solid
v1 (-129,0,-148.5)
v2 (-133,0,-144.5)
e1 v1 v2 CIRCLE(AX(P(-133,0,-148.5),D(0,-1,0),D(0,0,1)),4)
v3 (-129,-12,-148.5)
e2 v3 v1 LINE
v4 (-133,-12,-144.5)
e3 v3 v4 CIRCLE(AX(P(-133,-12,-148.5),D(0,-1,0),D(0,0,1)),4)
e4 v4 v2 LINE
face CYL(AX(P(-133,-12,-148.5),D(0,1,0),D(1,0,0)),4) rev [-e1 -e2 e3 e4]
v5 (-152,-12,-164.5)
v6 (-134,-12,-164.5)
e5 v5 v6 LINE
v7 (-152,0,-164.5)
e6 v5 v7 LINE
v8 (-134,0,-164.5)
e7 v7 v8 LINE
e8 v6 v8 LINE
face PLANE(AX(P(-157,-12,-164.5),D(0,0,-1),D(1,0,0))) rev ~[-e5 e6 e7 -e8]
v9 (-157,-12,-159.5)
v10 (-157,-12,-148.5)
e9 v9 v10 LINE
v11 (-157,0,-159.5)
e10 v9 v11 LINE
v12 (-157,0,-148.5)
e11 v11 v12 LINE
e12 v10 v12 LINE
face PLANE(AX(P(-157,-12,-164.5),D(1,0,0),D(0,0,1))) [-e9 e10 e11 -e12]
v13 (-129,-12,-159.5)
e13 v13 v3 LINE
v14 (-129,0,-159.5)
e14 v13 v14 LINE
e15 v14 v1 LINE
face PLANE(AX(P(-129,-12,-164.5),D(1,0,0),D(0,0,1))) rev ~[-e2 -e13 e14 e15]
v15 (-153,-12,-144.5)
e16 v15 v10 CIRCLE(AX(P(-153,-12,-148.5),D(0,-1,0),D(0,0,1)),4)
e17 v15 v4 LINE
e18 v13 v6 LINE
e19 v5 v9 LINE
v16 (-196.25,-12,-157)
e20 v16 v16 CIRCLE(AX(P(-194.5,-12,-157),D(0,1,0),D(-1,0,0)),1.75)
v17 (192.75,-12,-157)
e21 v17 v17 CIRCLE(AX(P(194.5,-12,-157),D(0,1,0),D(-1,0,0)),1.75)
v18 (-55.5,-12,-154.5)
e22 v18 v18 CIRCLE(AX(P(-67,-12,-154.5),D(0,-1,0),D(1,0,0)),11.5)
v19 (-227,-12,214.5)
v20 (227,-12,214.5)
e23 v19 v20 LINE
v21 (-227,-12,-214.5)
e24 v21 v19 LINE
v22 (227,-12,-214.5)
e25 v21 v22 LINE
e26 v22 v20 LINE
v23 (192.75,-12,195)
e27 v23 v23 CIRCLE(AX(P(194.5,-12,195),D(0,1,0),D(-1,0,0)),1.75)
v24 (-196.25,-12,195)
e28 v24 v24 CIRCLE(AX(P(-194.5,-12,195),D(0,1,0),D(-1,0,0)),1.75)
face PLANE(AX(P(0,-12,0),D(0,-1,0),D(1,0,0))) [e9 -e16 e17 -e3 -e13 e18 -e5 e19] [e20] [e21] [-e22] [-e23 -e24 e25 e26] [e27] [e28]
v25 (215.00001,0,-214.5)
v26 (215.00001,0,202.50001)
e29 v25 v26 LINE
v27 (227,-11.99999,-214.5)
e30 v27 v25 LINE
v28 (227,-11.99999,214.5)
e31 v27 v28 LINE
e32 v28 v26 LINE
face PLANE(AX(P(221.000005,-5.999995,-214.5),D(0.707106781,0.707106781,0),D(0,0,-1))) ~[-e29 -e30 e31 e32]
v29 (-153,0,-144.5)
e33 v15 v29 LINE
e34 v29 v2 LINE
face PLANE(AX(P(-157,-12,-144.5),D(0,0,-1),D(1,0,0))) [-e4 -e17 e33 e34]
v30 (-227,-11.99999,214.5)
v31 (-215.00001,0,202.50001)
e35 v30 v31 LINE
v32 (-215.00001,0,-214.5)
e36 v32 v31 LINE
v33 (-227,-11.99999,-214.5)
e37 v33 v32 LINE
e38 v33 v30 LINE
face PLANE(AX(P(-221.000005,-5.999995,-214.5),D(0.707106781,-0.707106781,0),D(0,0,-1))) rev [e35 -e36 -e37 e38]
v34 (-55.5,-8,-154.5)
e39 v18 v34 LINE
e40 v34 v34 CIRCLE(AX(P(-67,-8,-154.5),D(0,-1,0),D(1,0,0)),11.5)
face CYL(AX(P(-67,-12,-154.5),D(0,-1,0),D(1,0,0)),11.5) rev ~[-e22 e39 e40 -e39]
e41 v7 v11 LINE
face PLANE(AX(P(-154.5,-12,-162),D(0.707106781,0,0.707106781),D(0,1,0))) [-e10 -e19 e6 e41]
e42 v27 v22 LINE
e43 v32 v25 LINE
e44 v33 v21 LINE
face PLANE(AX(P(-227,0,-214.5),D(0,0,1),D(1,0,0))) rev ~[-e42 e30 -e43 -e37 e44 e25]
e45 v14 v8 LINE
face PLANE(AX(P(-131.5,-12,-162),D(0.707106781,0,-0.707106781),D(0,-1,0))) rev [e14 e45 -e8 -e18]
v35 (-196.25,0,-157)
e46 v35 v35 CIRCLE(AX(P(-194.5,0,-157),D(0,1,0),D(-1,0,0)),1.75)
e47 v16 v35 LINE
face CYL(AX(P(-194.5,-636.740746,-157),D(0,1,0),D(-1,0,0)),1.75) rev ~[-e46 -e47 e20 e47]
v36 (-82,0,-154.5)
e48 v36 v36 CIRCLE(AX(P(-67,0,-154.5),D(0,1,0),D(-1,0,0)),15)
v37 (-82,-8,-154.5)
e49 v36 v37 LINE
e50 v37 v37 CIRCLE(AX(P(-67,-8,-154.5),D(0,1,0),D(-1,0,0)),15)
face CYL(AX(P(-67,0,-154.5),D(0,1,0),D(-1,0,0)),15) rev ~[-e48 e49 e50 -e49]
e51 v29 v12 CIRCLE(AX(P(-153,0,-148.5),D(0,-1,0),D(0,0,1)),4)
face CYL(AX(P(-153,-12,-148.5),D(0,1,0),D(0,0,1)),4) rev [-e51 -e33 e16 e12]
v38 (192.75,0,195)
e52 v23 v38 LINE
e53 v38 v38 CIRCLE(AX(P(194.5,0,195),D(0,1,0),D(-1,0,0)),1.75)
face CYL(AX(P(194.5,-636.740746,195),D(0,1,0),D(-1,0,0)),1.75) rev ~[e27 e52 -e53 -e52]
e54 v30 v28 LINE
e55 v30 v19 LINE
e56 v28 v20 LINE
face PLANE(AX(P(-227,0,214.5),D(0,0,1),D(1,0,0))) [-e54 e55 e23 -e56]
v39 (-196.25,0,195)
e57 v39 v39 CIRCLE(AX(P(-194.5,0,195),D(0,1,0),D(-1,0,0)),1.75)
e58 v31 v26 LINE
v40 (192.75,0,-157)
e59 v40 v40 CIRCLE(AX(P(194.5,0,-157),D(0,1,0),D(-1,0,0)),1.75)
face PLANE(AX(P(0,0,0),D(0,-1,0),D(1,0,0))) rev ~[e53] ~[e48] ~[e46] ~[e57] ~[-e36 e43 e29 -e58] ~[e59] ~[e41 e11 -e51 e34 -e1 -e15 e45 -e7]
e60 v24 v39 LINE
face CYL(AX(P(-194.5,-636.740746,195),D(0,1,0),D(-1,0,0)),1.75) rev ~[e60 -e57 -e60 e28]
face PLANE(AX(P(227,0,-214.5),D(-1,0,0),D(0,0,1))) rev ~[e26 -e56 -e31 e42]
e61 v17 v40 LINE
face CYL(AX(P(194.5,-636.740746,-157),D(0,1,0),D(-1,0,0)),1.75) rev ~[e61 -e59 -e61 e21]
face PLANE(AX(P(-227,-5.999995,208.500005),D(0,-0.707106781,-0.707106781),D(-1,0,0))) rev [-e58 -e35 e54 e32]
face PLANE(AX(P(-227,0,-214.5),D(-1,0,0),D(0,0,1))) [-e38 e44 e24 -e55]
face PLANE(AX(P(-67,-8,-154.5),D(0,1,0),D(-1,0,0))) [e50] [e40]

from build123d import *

# Parameters (mm, degrees)
F0_W      = 454
F0_H      = 429
F1_DEPTH  = 12
F2_SIZE   = 11.99999
F3_W      = 28
F3_H      = 20
F3_R      = 11.5
F4_DEPTH  = 25
F5_R      = 4
F6_SIZE   = 5
F8_D      = 3.5
F9_R      = 15
F9_R_2    = 11.5
F10_DEPTH = 8


# Not quite as in the source:
# - a fillet or chamfer is up to 0.001 mm smaller than in the source, because OpenCascade refuses the exact size


with BuildPart() as f1:
    # F0 (on Front) → F1 (new body)
    with BuildSketch(Plane.XZ):
        Rectangle(F0_W, F0_H)
    extrude(amount=F1_DEPTH)

    # F2 (size 12 in the source; OpenCascade refuses exactly that, so slightly less here)
    f2_edges = [f1.edges().sort_by_distance(p)[0] for p in [
        (227, 0, 0),
        (-227, 0, 0),
        (0, 0, 214.5),
    ]]
    chamfer(f2_edges, length=F2_SIZE)

    # F3 (on face) → F4 (cut)
    with BuildSketch(Plane.XZ.offset(12)):
        with Locations((-143, -154.5)):
            Rectangle(F3_W, F3_H)
        with Locations((-67, -154.5)):
            Circle(F3_R)
    extrude(amount=-F4_DEPTH, mode=Mode.SUBTRACT)

    # F5
    f5_edges = [f1.edges().sort_by_distance(p)[0] for p in [
        (-129, -6, -144.5),
        (-157, -6, -144.5),
    ]]
    fillet(f5_edges, radius=F5_R)

    # F6
    f6_edges = [f1.edges().sort_by_distance(p)[0] for p in [
        (-157, -6, -164.5),
        (-129, -6, -164.5),
    ]]
    chamfer(f6_edges, length=F6_SIZE)

    # F8 (through all)
    with Locations(Plane.XZ.offset(12)):
        with Locations((-194.5, 195), (194.5, 195), (194.5, -157), (-194.5, -157)):
            Hole(F8_D / 2)

    # F9 (on face) → F10 (cut)
    with BuildSketch(Plane(origin=(0, 0, 0), x_dir=(-1, 0, 0), z_dir=(0, 1, 0))):
        with Locations((67, -154.5)):
            Circle(F9_R)
        with Locations((67, -154.5)):
            Circle(F9_R_2, mode=Mode.SUBTRACT)
        with Locations((67, -154.5)):
            Circle(F9_R_2)
    extrude(amount=-F10_DEPTH, mode=Mode.SUBTRACT)


solid = f1.part
